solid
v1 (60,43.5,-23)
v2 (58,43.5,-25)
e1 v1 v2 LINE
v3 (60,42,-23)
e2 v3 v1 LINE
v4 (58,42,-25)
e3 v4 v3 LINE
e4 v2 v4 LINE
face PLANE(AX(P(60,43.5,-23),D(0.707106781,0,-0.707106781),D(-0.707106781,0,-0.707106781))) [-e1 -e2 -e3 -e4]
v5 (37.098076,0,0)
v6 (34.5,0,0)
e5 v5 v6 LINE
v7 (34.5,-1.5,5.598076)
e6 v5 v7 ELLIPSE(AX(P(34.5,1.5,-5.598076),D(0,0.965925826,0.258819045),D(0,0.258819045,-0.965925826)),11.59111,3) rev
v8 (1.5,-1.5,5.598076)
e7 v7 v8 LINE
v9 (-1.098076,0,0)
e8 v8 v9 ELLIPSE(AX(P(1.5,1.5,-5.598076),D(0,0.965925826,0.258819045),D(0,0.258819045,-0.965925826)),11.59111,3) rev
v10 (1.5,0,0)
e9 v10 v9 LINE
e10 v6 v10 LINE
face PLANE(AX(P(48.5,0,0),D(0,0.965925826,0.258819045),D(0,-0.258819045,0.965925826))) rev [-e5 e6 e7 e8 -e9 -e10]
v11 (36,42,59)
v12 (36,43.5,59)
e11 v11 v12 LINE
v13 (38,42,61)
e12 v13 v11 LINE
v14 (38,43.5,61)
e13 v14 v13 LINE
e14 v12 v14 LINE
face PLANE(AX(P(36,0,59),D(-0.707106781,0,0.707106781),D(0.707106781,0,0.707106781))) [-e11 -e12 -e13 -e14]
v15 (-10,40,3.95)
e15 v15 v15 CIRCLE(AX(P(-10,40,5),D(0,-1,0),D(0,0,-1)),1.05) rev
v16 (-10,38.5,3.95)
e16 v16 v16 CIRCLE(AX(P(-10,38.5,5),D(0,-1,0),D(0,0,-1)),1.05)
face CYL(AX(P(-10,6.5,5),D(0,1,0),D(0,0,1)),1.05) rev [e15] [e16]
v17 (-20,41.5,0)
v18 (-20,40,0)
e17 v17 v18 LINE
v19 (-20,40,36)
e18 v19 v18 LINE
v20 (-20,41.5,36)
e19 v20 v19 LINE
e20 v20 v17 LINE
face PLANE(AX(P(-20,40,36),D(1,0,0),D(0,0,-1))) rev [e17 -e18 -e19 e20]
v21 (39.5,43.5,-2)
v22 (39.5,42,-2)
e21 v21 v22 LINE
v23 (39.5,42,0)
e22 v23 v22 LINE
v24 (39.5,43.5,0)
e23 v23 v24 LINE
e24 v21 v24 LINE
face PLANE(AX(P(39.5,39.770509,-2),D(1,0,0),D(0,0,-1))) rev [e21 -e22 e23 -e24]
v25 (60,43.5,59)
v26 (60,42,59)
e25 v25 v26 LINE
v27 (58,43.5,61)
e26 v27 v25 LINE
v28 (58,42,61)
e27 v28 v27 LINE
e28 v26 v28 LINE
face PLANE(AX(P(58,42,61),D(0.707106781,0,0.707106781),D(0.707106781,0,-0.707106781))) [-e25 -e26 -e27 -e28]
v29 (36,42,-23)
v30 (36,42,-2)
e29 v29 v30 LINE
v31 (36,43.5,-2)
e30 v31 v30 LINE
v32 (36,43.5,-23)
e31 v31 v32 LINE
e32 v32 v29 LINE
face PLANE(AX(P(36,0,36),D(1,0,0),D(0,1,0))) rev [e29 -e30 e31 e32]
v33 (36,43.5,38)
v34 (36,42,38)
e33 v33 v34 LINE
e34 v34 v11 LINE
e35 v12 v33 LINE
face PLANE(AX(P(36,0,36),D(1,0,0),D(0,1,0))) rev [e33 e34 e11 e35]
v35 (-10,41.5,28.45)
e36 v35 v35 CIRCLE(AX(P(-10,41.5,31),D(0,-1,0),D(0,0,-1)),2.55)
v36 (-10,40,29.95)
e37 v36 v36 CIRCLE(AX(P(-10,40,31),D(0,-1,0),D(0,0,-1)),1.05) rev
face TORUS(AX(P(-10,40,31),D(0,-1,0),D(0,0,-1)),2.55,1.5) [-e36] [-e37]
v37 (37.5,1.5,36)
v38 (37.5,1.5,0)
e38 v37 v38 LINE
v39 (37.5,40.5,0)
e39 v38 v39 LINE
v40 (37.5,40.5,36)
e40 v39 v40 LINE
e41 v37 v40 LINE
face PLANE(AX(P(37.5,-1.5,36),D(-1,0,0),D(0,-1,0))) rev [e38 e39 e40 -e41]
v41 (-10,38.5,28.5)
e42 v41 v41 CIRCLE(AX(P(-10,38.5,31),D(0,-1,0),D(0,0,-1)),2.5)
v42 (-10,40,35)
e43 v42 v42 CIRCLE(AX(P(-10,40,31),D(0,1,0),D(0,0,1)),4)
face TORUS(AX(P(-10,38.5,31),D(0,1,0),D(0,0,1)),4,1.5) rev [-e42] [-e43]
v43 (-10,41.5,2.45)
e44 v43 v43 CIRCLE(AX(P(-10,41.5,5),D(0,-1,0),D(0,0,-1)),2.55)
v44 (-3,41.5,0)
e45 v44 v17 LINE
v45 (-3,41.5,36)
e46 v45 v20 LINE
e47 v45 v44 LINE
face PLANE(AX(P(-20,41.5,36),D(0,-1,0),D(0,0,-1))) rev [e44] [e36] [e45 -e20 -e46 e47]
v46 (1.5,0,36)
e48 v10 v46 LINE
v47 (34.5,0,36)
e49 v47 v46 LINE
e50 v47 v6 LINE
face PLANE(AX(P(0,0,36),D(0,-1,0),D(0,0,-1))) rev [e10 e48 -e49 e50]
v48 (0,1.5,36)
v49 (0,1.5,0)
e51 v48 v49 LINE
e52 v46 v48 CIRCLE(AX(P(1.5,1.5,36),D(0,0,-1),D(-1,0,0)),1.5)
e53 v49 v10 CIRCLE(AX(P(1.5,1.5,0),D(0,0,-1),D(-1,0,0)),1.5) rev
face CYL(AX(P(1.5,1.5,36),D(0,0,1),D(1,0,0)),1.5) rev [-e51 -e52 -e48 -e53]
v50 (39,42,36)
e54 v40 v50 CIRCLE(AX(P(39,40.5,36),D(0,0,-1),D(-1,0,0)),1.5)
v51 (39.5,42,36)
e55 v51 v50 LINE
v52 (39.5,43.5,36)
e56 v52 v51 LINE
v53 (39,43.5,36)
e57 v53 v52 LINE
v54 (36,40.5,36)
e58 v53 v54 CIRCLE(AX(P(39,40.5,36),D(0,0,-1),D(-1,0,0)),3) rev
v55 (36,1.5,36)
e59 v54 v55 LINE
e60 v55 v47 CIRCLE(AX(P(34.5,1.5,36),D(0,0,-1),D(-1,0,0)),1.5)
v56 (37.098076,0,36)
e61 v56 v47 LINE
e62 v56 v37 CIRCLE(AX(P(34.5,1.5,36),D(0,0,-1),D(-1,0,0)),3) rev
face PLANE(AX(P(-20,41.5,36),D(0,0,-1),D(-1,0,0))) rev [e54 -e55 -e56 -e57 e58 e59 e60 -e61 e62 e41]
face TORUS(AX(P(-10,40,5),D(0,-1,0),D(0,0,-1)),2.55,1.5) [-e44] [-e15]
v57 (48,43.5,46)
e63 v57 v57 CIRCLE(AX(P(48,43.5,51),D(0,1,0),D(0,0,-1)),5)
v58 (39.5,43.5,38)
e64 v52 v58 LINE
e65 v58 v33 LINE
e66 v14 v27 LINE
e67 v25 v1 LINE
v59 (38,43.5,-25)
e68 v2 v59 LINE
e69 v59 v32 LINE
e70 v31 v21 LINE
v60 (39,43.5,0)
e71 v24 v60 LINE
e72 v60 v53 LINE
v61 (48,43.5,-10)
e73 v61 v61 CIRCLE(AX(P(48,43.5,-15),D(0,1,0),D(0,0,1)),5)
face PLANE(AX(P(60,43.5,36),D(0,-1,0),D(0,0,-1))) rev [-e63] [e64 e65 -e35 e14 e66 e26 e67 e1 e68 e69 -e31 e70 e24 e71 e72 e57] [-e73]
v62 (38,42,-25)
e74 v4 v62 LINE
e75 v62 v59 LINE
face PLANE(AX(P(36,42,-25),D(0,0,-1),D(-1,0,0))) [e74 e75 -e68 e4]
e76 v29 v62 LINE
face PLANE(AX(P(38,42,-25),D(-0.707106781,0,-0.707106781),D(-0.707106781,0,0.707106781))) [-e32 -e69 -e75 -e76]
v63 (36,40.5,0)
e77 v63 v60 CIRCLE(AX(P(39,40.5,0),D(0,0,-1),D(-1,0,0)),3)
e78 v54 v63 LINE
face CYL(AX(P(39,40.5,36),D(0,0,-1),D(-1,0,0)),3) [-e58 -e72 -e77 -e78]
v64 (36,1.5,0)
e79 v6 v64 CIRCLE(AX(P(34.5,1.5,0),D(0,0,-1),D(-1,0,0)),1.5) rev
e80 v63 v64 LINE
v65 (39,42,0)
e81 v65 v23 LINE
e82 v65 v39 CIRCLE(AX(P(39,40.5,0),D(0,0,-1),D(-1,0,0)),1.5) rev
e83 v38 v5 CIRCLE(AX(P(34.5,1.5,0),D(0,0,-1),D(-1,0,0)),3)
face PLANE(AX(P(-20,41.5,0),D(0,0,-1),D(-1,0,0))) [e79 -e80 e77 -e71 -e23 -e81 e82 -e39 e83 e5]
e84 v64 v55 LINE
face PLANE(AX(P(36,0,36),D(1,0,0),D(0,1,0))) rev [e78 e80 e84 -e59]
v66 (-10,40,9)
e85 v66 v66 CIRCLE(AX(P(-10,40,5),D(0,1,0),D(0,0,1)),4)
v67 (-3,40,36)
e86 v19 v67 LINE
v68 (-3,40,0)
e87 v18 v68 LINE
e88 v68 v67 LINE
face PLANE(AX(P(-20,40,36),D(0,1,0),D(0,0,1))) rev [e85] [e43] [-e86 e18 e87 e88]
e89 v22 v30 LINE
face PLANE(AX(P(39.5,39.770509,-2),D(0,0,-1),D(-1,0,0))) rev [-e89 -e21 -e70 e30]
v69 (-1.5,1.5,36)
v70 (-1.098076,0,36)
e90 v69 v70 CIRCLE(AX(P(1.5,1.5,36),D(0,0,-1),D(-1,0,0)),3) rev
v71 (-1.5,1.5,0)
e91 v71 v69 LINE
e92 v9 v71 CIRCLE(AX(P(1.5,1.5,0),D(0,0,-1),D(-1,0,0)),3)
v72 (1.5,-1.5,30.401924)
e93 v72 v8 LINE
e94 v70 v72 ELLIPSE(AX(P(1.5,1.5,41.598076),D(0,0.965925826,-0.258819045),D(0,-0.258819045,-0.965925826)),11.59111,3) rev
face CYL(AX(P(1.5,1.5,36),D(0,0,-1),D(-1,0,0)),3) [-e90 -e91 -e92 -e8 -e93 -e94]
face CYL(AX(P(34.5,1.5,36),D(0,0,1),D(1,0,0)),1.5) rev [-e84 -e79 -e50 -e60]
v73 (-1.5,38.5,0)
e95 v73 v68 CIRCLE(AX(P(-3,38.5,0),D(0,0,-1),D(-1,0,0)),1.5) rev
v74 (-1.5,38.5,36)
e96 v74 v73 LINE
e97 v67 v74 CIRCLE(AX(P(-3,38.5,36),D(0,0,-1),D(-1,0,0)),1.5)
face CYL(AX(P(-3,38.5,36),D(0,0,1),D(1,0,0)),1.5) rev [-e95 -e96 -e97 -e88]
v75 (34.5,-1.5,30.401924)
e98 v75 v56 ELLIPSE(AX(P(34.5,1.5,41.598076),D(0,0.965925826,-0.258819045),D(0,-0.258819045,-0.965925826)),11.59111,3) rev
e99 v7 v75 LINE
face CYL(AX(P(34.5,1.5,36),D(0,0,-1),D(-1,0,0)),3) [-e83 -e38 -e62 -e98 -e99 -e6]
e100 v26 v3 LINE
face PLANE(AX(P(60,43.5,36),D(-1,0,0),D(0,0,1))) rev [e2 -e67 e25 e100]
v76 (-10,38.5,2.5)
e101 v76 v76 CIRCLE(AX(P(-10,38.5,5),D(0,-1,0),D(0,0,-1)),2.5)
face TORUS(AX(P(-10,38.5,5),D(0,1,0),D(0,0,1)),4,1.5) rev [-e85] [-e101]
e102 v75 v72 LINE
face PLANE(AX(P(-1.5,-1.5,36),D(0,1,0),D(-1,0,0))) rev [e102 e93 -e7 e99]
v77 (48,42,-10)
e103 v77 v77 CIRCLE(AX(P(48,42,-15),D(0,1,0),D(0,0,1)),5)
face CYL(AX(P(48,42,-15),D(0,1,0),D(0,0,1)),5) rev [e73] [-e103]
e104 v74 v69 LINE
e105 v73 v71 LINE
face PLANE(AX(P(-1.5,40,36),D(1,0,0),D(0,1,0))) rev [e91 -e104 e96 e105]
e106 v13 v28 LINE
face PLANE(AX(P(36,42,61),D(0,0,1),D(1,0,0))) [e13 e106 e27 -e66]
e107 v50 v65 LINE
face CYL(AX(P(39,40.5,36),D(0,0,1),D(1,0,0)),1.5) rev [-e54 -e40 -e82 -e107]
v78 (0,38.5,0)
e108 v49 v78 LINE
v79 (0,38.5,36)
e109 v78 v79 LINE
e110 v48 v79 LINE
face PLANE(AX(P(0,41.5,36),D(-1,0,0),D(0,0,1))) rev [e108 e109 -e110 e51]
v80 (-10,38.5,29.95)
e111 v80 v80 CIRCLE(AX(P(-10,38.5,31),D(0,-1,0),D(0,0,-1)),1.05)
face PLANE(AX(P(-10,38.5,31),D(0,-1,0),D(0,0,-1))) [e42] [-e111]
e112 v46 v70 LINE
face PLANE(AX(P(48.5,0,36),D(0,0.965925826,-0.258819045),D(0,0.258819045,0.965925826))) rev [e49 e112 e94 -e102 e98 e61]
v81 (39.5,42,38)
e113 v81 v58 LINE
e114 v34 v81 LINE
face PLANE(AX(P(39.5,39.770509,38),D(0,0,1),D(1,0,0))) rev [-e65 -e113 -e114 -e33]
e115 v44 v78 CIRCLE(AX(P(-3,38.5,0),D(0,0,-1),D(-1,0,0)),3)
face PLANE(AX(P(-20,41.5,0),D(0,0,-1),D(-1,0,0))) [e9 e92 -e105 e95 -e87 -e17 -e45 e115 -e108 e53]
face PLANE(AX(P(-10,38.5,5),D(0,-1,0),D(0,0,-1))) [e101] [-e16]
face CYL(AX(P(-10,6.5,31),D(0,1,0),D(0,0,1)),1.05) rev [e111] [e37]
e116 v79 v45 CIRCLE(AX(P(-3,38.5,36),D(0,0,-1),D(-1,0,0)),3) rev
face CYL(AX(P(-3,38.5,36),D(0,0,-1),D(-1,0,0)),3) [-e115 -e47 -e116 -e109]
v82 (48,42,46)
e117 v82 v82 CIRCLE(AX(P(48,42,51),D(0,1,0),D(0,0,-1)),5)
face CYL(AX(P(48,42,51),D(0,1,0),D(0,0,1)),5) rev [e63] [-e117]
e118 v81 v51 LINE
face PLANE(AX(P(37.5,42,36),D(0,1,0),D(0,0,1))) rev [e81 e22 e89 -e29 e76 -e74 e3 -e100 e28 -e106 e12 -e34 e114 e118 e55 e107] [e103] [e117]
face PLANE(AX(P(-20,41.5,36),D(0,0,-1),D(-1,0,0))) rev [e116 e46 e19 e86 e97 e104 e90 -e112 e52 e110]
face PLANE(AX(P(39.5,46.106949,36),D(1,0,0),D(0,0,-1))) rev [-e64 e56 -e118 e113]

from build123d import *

# Parameters (mm, degrees)
EXTRUDE_1_DEPTH     = 36
SKETCH_2_R          = 1.05
CUT_EXTRUDE_1_DEPTH = 35
FILLET_1_R          = 1.5
FILLET_2_R          = 3
CUT_EXTRUDE_5_DEPTH = 50
SKETCH_5_W          = 24
SKETCH_5_H          = 86
SKETCH_5_R          = 5
EXTRUDE_2_DEPTH     = 1.5
SKETCH_6_W          = 2
SKETCH_6_H          = 6.336440046
CUT_EXTRUDE_6_DEPTH = 3.5
FILLET_3_R          = 1.5
FILLET_4_R          = 3
SKETCH_7_R          = 2.5
SKETCH_7_R_2        = 1.05
EXTRUDE_3_DEPTH     = 1.5
FILLET_5_R          = 1.5
CHAMFER_1_SIZE      = 2


with BuildPart() as part:
    # Эскиз1 → Вытянуть1 (new body)
    with BuildSketch(Plane.XY):
        Polygon((-20, 41.5), (0, 41.5), (0, 0), (36, 0), (36, 43.5), (60, 43.5), (60, 42), (37.5, 42), (37.5, -1.5), (-1.5, -1.5), (-1.5, 40), (-20, 40), align=None)
    extrude(amount=EXTRUDE_1_DEPTH)

    # Эскиз2 → Вырез-Вытянуть1 (cut)
    with BuildSketch(Plane(origin=(0, 41.5, 0), x_dir=(-1, 0, 0), z_dir=(0, 1, 0))):
        with Locations(Location((10, 5, 0), (0, 0, 90))):
            Circle(SKETCH_2_R)
        with Locations(Location((10, 31, 0), (0, 0, 90))):
            Circle(SKETCH_2_R)
    extrude(amount=-CUT_EXTRUDE_1_DEPTH, mode=Mode.SUBTRACT)

    # Скругление1
    fillet_1_edges = [part.edges().sort_by_distance(p)[0] for p in [
        (0, 0, 18),
        (36, 0, 18),
        (-1.5, 40, 18),
    ]]
    fillet(fillet_1_edges, radius=FILLET_1_R)

    # Скругление2
    fillet_2_edges = [part.edges().sort_by_distance(p)[0] for p in [
        (0, 41.5, 18),
        (37.5, -1.5, 18),
        (-1.5, -1.5, 18),
    ]]
    fillet(fillet_2_edges, radius=FILLET_2_R)

    # Эскиз4 → Вырез-Вытянуть5 (cut)
    with BuildSketch(Plane.ZY.offset(1.5)):
        Polygon((36, 0), (30.401923789, -1.5), (5.598076211, -1.5), (0, 0), (0, -9.726752533), (36, -8.93099636), align=None)
    extrude(amount=-CUT_EXTRUDE_5_DEPTH, mode=Mode.SUBTRACT)

    # Эскиз5 → Вытянуть2 (add)
    with BuildSketch(Plane(origin=(0, 43.5, 0), x_dir=(-1, 0, 0), z_dir=(0, 1, 0))):
        with Locations((-48, 18)):
            Rectangle(SKETCH_5_W, SKETCH_5_H)
        with Locations(Location((-48, -15, 0), (0, 0, 90))):
            Circle(SKETCH_5_R, mode=Mode.SUBTRACT)
        with Locations(Location((-48, 51, 0), (0, 0, 270))):
            Circle(SKETCH_5_R, mode=Mode.SUBTRACT)
    extrude(amount=-EXTRUDE_2_DEPTH)

    # Эскиз6 → Вырез-Вытянуть6 (cut)
    with BuildSketch(Plane.ZY.offset(-36)):
        with Locations((37, 42.938728947)):
            Rectangle(SKETCH_6_W, SKETCH_6_H)
        with Locations((-1, 42.938728947)):
            Rectangle(SKETCH_6_W, SKETCH_6_H)
    extrude(amount=-CUT_EXTRUDE_6_DEPTH, mode=Mode.SUBTRACT)

    # Скругление3
    fillet_3_edges = [part.edges().sort_by_distance(p)[0] for p in [
        (37.5, 42, 18),
    ]]
    fillet(fillet_3_edges, radius=FILLET_3_R)

    # Скругление4
    fillet_4_edges = [part.edges().sort_by_distance(p)[0] for p in [
        (36, 43.5, 18),
    ]]
    fillet(fillet_4_edges, radius=FILLET_4_R)

    # Эскиз7 → Вытянуть3 (add)
    # profile 1 of 2: a face of its own
    with BuildSketch(Plane.XZ.offset(-40)):
        with Locations(Location((-10, 31, 0), (0, 0, 90))):
            Circle(SKETCH_7_R)
        with Locations(Location((-10, 31, 0), (0, 0, 90))):
            Circle(SKETCH_7_R_2, mode=Mode.SUBTRACT)
    # profile 2 of 2: a face of its own
    with BuildSketch(Plane.XZ.offset(-40)):
        with Locations(Location((-10, 5, 0), (0, 0, 90))):
            Circle(SKETCH_7_R)
        with Locations(Location((-10, 5, 0), (0, 0, 90))):
            Circle(SKETCH_7_R_2, mode=Mode.SUBTRACT)
    extrude(amount=EXTRUDE_3_DEPTH)

    # Скругление5
    fillet_5_edges = [part.edges().sort_by_distance(p)[0] for p in [
        (-10, 40, 28.5),
        (-10, 40, 2.5),
        (-10, 41.5, 3.95),
        (-10, 41.5, 29.95),
    ]]
    fillet(fillet_5_edges, radius=FILLET_5_R - 0.0001)  # a hair under: the kernel refuses the full size

    # Фаска1
    chamfer_1_edges = [part.edges().sort_by_distance(p)[0] for p in [
        (36, 42.75, 61),
        (36, 42.75, -25),
        (60, 42.75, -25),
        (60, 42.75, 61),
    ]]
    chamfer(chamfer_1_edges, length=CHAMFER_1_SIZE)


solid = part.part
